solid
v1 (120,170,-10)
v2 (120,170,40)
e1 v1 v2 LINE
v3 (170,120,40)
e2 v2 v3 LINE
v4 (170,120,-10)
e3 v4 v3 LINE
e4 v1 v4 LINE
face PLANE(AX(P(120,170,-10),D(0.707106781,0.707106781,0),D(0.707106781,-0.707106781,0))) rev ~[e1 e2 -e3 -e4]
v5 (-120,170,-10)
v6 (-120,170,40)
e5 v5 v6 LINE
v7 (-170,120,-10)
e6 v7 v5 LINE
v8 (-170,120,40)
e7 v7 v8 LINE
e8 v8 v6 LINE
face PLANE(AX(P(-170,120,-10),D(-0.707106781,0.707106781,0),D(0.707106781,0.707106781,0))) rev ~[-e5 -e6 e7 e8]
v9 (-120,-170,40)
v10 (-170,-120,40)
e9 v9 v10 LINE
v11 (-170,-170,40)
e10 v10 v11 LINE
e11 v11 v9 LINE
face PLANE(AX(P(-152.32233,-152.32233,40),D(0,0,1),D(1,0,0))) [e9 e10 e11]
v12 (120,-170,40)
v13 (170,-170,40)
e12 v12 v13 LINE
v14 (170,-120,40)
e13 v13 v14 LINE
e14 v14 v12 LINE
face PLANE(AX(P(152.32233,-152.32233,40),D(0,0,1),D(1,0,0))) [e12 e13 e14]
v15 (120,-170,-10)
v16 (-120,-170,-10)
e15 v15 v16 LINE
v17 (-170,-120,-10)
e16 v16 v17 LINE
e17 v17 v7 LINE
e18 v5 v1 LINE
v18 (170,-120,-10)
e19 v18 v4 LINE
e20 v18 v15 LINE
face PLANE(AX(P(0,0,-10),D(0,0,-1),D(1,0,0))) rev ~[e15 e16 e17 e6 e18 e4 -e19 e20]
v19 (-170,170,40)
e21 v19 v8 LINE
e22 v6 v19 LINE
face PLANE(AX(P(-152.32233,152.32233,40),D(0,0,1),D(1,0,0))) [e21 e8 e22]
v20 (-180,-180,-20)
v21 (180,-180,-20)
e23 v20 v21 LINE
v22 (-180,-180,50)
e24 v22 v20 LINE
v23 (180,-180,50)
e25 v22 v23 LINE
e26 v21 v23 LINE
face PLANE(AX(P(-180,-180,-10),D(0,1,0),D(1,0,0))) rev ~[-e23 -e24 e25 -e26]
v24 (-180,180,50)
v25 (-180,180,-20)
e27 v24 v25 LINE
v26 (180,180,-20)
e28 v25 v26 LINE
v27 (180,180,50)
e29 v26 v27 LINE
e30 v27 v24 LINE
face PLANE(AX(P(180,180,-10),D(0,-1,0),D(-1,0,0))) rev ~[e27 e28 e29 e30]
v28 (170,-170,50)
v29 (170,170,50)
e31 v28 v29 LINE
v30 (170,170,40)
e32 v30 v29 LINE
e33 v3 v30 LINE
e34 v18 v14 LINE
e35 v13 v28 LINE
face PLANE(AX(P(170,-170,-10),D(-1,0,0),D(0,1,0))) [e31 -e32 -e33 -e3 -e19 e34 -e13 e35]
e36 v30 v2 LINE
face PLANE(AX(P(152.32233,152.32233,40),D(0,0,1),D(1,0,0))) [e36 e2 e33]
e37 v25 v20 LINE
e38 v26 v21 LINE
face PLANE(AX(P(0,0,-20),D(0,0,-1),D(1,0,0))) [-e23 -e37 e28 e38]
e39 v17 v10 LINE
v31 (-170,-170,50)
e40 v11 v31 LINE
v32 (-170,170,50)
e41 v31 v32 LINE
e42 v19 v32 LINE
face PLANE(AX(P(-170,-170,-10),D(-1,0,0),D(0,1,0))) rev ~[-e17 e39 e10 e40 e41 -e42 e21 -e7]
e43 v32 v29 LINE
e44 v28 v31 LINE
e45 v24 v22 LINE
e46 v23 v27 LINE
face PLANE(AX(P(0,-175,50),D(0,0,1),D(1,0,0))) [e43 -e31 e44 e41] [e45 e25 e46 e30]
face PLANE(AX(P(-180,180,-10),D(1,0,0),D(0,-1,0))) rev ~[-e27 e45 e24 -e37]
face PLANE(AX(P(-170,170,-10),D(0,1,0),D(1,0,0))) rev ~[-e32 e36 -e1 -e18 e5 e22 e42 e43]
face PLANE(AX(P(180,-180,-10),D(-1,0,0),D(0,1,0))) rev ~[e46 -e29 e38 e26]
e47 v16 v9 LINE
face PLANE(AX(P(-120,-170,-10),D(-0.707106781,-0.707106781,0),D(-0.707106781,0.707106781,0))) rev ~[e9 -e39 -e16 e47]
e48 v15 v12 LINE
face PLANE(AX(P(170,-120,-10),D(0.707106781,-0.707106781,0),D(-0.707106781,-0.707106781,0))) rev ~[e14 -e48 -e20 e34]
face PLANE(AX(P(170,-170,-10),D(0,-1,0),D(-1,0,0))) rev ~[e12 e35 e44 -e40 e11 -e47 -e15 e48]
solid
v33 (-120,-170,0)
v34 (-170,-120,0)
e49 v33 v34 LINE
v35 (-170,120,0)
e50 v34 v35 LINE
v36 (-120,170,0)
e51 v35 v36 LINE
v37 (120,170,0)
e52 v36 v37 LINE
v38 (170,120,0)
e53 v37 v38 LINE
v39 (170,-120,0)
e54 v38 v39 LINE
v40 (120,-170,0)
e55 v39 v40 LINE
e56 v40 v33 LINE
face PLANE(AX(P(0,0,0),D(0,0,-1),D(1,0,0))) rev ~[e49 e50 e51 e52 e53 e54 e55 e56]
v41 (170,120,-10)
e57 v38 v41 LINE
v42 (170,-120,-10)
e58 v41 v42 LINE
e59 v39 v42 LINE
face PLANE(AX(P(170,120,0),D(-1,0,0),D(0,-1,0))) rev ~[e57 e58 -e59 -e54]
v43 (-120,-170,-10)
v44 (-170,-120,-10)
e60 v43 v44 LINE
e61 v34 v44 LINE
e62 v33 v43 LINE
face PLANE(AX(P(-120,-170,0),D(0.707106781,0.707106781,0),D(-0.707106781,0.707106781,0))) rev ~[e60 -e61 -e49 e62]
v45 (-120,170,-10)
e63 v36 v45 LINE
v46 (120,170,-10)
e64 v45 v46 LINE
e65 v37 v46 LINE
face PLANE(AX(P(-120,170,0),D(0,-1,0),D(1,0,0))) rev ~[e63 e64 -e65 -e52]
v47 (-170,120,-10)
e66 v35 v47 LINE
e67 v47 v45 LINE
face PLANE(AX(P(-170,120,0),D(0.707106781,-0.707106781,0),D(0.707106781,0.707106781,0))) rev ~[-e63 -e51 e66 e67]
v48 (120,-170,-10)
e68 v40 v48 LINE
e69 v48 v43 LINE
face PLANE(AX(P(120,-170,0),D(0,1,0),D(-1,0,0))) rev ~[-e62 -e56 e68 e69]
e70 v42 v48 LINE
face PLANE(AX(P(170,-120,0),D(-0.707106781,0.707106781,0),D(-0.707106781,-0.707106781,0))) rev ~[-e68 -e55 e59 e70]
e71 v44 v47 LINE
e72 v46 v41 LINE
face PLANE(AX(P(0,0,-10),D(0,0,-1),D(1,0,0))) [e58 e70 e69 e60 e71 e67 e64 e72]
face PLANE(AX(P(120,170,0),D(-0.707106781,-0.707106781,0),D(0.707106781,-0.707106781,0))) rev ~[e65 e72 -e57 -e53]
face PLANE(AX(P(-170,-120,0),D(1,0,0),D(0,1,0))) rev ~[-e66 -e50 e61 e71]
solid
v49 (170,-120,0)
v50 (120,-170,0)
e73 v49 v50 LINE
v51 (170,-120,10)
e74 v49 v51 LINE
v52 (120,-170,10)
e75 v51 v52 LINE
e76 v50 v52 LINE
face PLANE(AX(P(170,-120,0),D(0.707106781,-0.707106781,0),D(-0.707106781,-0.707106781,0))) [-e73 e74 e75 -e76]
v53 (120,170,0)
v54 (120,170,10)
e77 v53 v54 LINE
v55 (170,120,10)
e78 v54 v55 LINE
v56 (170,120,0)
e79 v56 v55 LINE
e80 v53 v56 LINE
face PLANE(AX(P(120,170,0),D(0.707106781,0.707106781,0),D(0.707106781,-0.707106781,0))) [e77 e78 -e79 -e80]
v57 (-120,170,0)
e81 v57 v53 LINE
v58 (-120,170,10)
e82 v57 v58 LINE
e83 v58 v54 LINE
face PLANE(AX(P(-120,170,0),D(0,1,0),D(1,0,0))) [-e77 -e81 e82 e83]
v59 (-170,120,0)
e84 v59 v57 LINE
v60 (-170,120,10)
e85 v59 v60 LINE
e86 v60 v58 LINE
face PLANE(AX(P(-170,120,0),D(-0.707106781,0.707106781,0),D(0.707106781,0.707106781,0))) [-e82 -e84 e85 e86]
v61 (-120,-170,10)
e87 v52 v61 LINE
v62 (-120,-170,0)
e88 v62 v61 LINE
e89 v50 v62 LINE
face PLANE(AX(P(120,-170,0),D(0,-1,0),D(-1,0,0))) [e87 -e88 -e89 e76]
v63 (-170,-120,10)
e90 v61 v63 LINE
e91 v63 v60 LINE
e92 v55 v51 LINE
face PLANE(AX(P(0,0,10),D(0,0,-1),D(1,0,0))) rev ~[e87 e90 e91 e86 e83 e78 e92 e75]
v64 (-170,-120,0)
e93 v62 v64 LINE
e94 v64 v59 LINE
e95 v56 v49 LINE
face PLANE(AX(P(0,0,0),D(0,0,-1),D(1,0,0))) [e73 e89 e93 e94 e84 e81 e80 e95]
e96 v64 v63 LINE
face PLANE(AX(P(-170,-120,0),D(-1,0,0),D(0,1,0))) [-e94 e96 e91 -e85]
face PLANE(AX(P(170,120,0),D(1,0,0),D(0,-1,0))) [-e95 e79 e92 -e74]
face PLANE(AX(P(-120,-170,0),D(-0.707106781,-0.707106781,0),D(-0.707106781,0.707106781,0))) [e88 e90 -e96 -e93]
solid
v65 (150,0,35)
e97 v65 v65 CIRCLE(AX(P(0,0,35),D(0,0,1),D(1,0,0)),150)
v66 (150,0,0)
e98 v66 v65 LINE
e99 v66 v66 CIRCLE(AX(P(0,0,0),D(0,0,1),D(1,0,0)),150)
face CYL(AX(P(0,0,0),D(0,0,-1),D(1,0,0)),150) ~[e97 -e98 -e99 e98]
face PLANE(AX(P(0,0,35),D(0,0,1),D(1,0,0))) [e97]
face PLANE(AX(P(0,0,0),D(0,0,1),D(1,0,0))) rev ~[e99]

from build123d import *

# Parameters (mm, degrees)
F1_R      = 150
F2_DEPTH  = 35
F3_R      = 150
F4_DEPTH  = 10
F5_DEPTH  = 10
F6_W      = 360
F6_H      = 360
F7_DEPTH  = 10
F8_W      = 10
F8_H      = 340
F9_DEPTH  = 60
F11_DEPTH = 50


with BuildPart() as f2:
    # F1 (on Top) → F2 (new body)
    with BuildSketch(Plane.XY):
        Circle(F1_R)
    extrude(amount=F2_DEPTH)


with BuildPart() as f4:
    # F3 (on face) → F4 (new body)
    with BuildSketch(Plane(origin=(0, 0, 0), x_dir=(1, 0, 0), z_dir=(0, 0, -1))):
        Polygon((120, 170), (-120, 170), (-170, 120), (-170, -120), (-120, -170), (120, -170), (170, -120), (170, 120), align=None)
        Circle(F3_R, mode=Mode.SUBTRACT)
        Circle(F3_R)
    extrude(amount=F4_DEPTH)


with BuildPart() as f5:
    # F5 (new): a face of the model
    f5_faces = [f4.part.faces().sort_by_distance(p)[0] for p in [
        (0, 0, 0),
    ]]
    extrude(f5_faces, amount=F5_DEPTH)


with BuildPart() as f7:
    # F6 (on face) → F7 (new body)
    with BuildSketch(Plane(origin=(0, 0, -10), x_dir=(1, 0, 0), z_dir=(0, 0, -1))):
        Rectangle(F6_W, F6_H)
        Polygon((-120, 170), (120, 170), (170, 120), (170, -120), (120, -170), (-120, -170), (-170, -120), (-170, 120), align=None, mode=Mode.SUBTRACT)
        Polygon((170, 120), (120, 170), (-120, 170), (-170, 120), (-170, -120), (-120, -170), (120, -170), (170, -120), align=None)
    extrude(amount=F7_DEPTH)

    # F8 (on face) → F9 (join)
    with BuildSketch(Plane.XY.offset(-10)):
        Polygon((-180, -170), (-180, -180), (180, -180), (180, -170), (170, -170), (-170, -170), align=None)
        with Locations((-175, 0)):
            Rectangle(F8_W, F8_H)
        Polygon((-180, 180), (-180, 170), (-170, 170), (170, 170), (180, 170), (180, 180), align=None)
        with Locations((175, 0)):
            Rectangle(F8_W, F8_H)
    extrude(amount=F9_DEPTH)

    # F10 (on face) → F11 (join)
    with BuildSketch(Plane.XY.offset(-10)):
        Polygon((-170, -170), (-120, -170), (-170, -120), align=None)
        Polygon((120, -170), (170, -170), (170, -120), align=None)
        Polygon((120, 170), (170, 120), (170, 170), align=None)
        Polygon((-170, 170), (-170, 120), (-120, 170), align=None)
    extrude(amount=F11_DEPTH)


solid = Compound([f2.part, f4.part, f5.part, f7.part])
